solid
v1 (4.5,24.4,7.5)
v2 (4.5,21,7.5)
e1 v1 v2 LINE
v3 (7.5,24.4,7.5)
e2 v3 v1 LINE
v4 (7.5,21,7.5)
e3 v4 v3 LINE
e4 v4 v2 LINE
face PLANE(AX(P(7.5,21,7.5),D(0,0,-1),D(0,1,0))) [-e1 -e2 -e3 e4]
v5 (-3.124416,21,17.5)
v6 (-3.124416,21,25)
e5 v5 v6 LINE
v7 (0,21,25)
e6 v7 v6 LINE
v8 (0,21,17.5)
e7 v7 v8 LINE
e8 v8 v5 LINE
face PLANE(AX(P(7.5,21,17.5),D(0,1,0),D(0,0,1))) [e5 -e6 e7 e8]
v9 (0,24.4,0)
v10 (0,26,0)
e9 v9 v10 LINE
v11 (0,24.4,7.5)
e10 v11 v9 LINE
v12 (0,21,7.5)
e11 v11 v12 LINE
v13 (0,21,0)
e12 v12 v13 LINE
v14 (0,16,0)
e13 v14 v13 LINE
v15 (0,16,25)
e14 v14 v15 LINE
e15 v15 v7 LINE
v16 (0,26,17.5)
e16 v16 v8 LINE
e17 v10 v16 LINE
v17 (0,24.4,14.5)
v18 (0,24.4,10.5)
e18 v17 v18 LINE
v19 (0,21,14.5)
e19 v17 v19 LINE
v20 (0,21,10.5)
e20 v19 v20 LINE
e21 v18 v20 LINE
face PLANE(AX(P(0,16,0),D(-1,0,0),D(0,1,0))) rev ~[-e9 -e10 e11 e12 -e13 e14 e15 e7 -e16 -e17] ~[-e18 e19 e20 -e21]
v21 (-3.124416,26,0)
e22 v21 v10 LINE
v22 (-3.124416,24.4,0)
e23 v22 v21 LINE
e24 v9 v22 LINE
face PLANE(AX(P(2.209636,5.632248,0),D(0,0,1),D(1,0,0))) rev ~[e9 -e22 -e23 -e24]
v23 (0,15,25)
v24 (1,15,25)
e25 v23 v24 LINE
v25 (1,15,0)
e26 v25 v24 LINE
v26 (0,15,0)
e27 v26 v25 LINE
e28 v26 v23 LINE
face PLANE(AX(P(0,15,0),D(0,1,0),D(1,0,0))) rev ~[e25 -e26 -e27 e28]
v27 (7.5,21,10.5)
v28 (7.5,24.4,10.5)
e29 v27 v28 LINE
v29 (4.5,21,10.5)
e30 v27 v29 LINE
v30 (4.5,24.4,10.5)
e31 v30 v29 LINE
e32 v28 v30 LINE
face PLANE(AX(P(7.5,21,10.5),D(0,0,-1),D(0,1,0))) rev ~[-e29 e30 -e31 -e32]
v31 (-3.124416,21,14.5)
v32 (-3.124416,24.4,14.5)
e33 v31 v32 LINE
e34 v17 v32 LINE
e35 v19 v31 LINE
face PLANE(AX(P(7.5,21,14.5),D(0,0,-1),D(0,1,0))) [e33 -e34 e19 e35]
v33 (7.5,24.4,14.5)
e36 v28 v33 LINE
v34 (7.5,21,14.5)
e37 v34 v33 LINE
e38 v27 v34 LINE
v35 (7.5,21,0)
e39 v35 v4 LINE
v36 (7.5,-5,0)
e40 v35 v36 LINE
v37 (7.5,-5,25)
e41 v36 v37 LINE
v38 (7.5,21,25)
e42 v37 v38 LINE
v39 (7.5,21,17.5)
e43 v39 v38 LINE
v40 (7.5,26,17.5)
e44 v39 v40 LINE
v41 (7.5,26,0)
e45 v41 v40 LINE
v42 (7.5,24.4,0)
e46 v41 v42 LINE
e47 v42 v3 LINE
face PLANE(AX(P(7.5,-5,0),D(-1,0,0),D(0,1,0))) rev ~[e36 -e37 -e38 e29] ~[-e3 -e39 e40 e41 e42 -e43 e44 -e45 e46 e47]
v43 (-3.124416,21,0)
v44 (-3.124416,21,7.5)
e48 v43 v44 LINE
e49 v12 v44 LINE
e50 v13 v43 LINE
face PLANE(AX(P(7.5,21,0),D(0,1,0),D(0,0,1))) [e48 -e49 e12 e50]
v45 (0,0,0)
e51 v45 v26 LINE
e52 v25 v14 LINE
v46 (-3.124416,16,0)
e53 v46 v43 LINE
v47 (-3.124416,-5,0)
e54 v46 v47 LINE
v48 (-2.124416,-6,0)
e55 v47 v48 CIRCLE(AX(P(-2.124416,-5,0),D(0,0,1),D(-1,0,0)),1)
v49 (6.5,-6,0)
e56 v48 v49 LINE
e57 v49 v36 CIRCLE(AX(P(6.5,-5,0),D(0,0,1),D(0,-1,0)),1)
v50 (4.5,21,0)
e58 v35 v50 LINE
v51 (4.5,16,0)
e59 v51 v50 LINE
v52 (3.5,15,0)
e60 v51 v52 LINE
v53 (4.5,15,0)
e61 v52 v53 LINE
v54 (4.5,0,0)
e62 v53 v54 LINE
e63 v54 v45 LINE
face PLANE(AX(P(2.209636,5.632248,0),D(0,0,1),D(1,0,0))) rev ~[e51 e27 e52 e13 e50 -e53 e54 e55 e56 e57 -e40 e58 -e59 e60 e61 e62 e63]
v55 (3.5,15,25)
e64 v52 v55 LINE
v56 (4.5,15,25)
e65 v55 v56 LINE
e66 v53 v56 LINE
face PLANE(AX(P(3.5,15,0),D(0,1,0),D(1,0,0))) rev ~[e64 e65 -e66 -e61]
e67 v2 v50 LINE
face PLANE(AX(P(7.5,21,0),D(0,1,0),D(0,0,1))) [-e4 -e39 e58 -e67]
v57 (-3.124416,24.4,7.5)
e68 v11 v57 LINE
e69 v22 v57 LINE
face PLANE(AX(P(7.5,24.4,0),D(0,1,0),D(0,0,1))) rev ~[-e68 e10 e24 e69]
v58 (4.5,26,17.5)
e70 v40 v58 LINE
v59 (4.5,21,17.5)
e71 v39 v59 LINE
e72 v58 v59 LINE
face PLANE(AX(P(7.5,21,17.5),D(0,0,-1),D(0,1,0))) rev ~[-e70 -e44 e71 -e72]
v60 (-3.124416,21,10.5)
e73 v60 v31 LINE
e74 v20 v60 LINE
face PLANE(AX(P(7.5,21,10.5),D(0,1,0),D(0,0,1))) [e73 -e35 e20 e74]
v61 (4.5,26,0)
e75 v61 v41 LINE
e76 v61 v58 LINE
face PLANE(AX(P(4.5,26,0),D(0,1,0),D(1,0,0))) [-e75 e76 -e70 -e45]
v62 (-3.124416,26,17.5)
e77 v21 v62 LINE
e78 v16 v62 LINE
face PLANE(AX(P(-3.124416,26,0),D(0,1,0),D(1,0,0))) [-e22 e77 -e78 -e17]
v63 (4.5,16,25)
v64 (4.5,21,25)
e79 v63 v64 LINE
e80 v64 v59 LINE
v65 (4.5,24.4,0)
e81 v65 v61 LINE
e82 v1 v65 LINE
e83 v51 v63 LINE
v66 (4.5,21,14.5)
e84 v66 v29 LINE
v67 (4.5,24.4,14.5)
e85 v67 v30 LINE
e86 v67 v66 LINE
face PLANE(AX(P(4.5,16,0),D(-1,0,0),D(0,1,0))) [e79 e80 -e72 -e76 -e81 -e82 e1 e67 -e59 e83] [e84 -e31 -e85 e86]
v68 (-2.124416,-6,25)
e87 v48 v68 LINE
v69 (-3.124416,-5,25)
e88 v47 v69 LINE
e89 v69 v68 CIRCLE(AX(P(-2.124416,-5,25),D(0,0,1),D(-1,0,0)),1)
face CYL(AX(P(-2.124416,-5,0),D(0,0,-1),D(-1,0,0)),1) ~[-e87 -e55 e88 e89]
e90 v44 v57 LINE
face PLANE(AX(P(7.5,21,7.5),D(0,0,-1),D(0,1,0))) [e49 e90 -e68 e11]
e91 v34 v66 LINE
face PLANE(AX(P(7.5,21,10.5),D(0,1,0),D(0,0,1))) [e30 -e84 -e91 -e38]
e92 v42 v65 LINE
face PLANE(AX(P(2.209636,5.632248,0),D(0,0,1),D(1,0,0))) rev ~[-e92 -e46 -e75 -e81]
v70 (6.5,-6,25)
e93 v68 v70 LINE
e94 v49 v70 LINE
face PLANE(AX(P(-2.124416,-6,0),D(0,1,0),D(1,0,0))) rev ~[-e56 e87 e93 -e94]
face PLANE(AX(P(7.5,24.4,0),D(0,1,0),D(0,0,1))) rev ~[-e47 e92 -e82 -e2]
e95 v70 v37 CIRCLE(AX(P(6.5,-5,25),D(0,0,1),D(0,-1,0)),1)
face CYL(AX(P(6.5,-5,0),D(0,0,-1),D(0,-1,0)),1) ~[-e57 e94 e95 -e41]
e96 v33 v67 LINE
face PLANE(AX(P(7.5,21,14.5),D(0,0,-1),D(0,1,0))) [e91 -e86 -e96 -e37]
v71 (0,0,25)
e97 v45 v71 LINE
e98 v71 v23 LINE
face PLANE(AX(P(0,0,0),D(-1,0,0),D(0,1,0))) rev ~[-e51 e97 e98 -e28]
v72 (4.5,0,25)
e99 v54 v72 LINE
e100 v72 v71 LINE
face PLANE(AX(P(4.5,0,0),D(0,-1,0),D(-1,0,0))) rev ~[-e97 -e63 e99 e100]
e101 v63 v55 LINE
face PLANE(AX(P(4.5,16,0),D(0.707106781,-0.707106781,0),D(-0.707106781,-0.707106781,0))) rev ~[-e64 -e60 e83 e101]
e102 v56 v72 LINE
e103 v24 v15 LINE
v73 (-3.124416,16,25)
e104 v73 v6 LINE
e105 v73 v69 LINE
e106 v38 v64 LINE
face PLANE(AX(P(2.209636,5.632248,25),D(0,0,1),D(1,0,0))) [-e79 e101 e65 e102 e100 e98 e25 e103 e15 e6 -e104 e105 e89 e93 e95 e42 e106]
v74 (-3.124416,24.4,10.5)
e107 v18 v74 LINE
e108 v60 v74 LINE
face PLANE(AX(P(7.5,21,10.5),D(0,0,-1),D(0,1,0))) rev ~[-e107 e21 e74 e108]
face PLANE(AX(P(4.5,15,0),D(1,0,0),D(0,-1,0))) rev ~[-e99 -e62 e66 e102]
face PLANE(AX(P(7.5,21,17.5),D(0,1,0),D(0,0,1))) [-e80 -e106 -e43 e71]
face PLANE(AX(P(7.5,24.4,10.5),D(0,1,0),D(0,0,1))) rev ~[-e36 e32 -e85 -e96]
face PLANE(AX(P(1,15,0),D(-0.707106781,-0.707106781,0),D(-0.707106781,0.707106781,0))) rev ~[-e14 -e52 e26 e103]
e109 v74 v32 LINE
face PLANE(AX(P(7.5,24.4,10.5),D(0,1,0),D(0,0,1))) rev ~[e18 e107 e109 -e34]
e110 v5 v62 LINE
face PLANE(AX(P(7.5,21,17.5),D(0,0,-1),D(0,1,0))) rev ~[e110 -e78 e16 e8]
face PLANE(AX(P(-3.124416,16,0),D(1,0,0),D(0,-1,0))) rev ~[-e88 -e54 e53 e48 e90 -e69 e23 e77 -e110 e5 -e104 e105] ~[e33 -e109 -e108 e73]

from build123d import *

# Parameters (mm, degrees)
F1_DEPTH = 25
F0_W     = 3.1244163401
F0_H     = 10
F0_W_2   = 3
F2_DEPTH = 25
F3_W     = 3.4
F3_H     = 4
F3_W_2   = 5
F3_H_2   = 7.5
F4_DEPTH = 25


# Not quite as in the source:
# - a feature names something its author has since deleted; it is built from what else it names


with BuildPart() as f1:
    # F0 (on Top) → F1 (new body)
    with BuildSketch(Plane.XY):
        with BuildLine():
            Line((4.5, 0), (0, 0))
            Line((0, 0), (0, 15))
            Line((0, 15), (1, 15))
            Line((1, 15), (0, 16))
            Line((0, 16), (-3.1244163401, 16))
            Line((-3.1244163401, 16), (-3.1244163401, 15))
            Line((-3.1244163401, 15), (-3.1244163401, 0))
            Line((-3.1244163401, 0), (-3.1244163401, -5))
            ThreePointArc((-3.1244163401, -5), (-2.8315231213, -5.7071067812), (-2.1244163401, -6))
            Line((-2.1244163401, -6), (4.5, -6))
            Line((4.5, -6), (6.5, -6))
            ThreePointArc((6.5, -6), (7.2071067812, -5.7071067812), (7.5, -5))
            Line((7.5, -5), (7.5, 15))
            Line((7.5, 15), (7.5, 16))
            Line((7.5, 16), (4.5, 16))
            Line((4.5, 16), (3.5, 15))
            Line((3.5, 15), (4.5, 15))
            Line((4.5, 15), (4.5, 0))
        make_face()
    extrude(amount=F1_DEPTH)

    # F0 (on Top) → F2 (join)
    with BuildSketch(Plane.XY):
        with BuildLine():
            Line((4.5, 0), (0, 0))
            Line((0, 0), (0, 15))
            Line((0, 15), (1, 15))
            Line((1, 15), (0, 16))
            Line((0, 16), (-3.1244163401, 16))
            Line((-3.1244163401, 16), (-3.1244163401, 15))
            Line((-3.1244163401, 15), (-3.1244163401, 0))
            Line((-3.1244163401, 0), (-3.1244163401, -5))
            ThreePointArc((-3.1244163401, -5), (-2.8315231213, -5.7071067812), (-2.1244163401, -6))
            Line((-2.1244163401, -6), (4.5, -6))
            Line((4.5, -6), (6.5, -6))
            ThreePointArc((6.5, -6), (7.2071067812, -5.7071067812), (7.5, -5))
            Line((7.5, -5), (7.5, 15))
            Line((7.5, 15), (7.5, 16))
            Line((7.5, 16), (4.5, 16))
            Line((4.5, 16), (3.5, 15))
            Line((3.5, 15), (4.5, 15))
            Line((4.5, 15), (4.5, 0))
        make_face()
        with Locations((-1.5622081701, 21)):
            Rectangle(F0_W, F0_H)
        with Locations((6, 21)):
            Rectangle(F0_W_2, F0_H)
    extrude(amount=F2_DEPTH)

    # F3 (on face) → F4 (cut)
    with BuildSketch(Plane.YZ.offset(7.5)):
        with Locations((22.7, 12.5)):
            Rectangle(F3_W, F3_H)
        with Locations((23.5, 21.25)):
            Rectangle(F3_W_2, F3_H_2)
        with Locations((22.7, 3.75)):
            Rectangle(F3_W, F3_H_2)
    extrude(amount=-F4_DEPTH, mode=Mode.SUBTRACT)


solid = f1.part
